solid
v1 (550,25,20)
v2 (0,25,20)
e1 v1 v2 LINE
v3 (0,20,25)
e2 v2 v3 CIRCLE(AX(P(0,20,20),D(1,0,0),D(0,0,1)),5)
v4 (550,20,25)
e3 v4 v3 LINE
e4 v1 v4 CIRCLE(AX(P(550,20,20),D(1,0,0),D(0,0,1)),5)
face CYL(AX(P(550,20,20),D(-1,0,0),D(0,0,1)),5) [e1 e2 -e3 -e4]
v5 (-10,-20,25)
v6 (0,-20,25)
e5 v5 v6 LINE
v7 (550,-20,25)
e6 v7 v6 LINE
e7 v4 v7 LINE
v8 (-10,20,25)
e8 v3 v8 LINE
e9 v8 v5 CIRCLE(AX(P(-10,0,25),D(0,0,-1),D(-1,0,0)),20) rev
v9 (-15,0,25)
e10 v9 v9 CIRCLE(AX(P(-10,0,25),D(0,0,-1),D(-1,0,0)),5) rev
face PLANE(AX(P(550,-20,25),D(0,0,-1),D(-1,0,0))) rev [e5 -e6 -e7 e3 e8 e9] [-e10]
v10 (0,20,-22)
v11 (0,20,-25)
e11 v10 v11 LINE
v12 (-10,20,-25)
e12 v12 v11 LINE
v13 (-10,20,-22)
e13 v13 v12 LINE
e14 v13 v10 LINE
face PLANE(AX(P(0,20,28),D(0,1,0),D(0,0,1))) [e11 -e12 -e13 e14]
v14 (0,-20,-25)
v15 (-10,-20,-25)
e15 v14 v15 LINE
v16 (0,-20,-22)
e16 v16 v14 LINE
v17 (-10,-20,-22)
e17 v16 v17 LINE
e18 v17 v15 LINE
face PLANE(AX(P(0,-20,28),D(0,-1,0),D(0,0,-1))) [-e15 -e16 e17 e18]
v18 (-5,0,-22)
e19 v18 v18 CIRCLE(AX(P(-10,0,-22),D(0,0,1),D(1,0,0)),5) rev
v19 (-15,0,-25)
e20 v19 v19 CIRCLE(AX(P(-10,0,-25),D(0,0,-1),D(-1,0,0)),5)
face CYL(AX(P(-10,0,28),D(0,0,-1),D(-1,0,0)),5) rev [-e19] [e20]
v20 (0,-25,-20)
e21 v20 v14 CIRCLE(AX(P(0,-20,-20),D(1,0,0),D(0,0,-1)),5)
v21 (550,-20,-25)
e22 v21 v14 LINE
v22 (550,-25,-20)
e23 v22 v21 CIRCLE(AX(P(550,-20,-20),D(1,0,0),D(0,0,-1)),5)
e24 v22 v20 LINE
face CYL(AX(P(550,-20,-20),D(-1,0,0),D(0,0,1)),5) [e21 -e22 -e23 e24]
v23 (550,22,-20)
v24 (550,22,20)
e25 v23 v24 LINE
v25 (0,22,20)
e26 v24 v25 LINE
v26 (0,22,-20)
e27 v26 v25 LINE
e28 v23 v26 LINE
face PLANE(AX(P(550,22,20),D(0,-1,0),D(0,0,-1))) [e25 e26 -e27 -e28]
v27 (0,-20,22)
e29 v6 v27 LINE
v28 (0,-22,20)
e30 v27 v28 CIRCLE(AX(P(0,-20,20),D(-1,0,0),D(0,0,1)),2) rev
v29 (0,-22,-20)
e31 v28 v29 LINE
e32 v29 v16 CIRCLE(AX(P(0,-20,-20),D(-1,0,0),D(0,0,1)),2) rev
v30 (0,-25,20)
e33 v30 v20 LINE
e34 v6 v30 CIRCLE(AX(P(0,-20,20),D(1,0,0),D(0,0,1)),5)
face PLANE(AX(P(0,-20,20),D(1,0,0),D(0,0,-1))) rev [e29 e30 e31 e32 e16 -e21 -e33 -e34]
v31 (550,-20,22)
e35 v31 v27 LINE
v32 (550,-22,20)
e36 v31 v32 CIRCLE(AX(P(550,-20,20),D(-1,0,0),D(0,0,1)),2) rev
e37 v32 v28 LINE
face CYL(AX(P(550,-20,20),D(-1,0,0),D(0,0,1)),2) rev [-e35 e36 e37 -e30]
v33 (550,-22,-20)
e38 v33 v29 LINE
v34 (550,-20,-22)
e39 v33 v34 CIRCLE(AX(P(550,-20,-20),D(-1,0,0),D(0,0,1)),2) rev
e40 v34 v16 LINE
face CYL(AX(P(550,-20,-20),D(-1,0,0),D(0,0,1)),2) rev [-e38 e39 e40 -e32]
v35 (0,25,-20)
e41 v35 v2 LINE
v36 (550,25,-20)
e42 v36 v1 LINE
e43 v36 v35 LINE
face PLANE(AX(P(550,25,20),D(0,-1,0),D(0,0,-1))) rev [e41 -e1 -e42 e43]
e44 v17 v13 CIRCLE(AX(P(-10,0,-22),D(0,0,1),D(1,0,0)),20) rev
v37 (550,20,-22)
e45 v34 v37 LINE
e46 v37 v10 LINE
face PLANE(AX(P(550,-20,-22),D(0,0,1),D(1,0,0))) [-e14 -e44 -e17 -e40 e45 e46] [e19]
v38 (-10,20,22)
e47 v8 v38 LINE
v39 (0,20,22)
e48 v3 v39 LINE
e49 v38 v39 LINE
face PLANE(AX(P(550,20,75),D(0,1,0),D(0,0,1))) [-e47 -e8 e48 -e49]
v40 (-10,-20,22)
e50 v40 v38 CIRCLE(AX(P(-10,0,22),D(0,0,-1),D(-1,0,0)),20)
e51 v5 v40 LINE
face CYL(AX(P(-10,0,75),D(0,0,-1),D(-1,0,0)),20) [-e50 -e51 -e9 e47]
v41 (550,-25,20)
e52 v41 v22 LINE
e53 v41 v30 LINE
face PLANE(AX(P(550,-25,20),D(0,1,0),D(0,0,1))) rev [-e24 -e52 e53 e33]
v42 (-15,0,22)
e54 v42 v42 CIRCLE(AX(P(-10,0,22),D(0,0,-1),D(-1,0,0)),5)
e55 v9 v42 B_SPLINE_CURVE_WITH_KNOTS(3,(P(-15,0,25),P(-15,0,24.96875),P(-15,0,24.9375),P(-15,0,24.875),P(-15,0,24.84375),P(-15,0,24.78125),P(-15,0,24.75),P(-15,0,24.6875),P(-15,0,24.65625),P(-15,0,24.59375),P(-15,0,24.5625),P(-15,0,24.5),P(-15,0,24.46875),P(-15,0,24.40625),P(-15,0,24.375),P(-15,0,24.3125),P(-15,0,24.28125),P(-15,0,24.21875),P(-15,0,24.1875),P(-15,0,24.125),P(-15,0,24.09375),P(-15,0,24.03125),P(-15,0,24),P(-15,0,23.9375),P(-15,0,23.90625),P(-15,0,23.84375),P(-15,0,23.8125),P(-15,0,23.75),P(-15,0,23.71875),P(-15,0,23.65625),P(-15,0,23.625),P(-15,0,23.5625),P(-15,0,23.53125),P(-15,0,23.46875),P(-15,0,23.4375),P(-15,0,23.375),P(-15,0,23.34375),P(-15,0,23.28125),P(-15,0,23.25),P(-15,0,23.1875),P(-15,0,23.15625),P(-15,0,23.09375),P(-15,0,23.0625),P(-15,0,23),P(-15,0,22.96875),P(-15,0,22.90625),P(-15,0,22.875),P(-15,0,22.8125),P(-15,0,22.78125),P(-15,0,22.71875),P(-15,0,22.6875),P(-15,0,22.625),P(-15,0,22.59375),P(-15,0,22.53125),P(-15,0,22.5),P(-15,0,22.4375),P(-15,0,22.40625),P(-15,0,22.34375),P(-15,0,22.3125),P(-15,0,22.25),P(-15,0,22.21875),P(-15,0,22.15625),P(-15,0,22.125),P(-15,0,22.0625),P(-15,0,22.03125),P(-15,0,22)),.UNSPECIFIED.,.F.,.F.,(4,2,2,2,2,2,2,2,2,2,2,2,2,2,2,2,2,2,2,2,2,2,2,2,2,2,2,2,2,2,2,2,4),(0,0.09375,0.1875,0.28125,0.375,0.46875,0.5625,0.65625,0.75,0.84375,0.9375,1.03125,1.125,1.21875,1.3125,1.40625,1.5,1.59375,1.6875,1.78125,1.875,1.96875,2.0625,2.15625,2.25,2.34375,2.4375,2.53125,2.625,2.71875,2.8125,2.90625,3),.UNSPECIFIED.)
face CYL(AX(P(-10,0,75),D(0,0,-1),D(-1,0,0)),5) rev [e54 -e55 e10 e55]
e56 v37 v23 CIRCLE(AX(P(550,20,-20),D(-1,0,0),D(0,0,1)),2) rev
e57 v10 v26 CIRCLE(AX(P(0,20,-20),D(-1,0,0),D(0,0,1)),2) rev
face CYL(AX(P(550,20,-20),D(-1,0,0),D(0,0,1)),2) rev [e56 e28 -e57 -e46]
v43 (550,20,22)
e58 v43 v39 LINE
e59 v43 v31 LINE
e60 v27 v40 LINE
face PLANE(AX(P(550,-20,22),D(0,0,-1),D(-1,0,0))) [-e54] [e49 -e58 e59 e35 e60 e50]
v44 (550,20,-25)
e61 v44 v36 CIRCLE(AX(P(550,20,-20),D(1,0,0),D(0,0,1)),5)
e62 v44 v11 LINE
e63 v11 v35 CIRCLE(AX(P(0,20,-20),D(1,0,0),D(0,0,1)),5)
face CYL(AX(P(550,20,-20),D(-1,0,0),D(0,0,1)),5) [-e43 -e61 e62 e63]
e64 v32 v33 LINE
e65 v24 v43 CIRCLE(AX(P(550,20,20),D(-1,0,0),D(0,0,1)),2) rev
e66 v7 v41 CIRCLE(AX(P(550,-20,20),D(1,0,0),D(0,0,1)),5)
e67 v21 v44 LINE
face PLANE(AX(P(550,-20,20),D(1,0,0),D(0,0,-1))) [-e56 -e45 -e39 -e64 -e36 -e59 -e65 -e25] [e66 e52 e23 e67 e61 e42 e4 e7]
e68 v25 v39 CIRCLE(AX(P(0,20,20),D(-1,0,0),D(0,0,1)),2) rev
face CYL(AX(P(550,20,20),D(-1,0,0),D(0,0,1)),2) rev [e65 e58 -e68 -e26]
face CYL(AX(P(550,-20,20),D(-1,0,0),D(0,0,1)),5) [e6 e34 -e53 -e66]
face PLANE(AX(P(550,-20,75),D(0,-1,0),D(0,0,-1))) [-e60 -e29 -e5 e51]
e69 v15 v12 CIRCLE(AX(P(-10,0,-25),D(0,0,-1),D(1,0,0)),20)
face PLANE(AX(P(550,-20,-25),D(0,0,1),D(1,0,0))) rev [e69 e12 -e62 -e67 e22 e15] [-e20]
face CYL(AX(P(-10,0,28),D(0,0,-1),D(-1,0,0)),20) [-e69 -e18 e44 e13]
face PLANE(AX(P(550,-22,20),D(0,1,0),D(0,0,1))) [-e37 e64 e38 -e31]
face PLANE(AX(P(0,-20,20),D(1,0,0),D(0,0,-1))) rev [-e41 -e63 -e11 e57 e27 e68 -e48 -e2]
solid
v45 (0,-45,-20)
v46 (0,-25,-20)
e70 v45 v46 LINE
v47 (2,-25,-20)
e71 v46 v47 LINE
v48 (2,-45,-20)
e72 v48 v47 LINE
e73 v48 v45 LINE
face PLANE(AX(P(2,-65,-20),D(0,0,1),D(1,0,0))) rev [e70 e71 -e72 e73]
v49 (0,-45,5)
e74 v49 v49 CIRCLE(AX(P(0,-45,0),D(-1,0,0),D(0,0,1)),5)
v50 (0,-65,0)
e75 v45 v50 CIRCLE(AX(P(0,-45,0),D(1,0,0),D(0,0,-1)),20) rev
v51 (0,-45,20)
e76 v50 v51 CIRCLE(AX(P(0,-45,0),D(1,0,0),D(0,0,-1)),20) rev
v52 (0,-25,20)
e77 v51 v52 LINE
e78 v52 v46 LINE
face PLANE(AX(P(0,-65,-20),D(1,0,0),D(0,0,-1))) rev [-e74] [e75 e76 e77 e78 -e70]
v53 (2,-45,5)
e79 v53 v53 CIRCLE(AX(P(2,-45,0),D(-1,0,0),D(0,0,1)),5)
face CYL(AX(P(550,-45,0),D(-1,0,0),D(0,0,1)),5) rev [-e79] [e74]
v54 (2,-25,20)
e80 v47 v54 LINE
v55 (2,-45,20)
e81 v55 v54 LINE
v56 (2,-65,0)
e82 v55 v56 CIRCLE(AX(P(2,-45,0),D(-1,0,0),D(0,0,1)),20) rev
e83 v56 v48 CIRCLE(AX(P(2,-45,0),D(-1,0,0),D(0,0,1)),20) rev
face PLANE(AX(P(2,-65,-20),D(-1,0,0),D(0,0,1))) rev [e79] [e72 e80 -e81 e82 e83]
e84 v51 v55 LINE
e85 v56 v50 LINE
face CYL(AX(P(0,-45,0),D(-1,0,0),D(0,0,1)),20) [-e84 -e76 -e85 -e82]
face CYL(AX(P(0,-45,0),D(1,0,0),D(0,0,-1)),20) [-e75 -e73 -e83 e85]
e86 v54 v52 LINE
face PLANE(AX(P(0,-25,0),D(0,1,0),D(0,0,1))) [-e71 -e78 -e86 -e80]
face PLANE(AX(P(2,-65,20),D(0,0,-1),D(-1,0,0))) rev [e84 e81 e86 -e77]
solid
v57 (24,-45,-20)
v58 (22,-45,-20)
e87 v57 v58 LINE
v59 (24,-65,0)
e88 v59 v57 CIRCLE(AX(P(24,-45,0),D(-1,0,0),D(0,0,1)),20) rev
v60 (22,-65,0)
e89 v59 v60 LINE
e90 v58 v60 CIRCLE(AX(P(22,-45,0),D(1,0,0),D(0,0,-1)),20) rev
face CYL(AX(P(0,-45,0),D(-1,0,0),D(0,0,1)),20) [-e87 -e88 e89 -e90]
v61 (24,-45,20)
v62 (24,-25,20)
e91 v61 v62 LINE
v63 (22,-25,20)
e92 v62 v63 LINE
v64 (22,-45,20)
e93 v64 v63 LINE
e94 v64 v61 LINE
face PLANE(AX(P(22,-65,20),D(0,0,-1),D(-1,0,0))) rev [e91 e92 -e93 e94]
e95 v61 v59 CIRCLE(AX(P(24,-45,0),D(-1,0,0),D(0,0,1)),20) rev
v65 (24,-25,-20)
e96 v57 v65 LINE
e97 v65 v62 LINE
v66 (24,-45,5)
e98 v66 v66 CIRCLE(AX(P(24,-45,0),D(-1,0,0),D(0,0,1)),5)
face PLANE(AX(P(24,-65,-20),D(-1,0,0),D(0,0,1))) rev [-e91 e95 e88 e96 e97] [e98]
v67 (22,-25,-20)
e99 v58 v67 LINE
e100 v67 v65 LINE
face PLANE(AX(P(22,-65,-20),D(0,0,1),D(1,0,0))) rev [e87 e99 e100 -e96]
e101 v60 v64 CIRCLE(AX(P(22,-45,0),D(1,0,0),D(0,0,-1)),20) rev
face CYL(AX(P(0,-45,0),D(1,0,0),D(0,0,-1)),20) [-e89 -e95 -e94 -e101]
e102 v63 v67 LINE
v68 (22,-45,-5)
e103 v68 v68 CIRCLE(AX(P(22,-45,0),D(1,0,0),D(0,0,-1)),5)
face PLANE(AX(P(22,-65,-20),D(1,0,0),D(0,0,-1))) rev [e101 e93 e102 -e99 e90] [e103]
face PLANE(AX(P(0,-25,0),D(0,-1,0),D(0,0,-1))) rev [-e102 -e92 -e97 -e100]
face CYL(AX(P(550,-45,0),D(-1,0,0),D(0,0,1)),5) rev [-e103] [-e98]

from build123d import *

# Parameters (mm, degrees)
EXTRUDE_THIN1_DEPTH   = 550
SKETCH3_R             = 5
BOSS_EXTRUDE2_DEPTH   = 3
BOSS_EXTRUDE3_START   = -47
SKETCH3_3_R           = 5
BOSS_EXTRUDE3_DEPTH   = 3
SKETCH5_W             = 2
SKETCH5_H             = 40
BOSS_EXTRUDE4_DEPTH   = 40
BOSS_EXTRUDE4_2_DEPTH = 40
FILLET1_R             = 20
FILLET2_R             = 20
SKETCH6_R             = 5
CUT_EXTRUDE2_DEPTH    = 555.391558377


with BuildPart() as part:
    # Sketch1 → Extrude-Thin1 (new body)
    with BuildSketch(Plane(origin=(0, 0, 0), x_dir=(0, 0, -1), z_dir=(1, 0, 0))):
        with BuildLine():
            Line((-25, 20), (-25, -20))
            ThreePointArc((-25, -20), (-23.535533906, -23.535533906), (-20, -25))
            Line((-20, -25), (20, -25))
            ThreePointArc((20, -25), (23.535533906, -23.535533906), (25, -20))
            Line((25, -20), (25, 20))
            ThreePointArc((25, 20), (23.535533906, 23.535533906), (20, 25))
            Line((20, 25), (-20, 25))
            ThreePointArc((-20, 25), (-23.535533906, 23.535533906), (-25, 20))
        make_face()
        with BuildLine():
            Line((-22, 20), (-22, -20))
            ThreePointArc((-22, -20), (-21.414213562, -21.414213562), (-20, -22))
            Line((-20, -22), (20, -22))
            ThreePointArc((20, -22), (21.414213562, -21.414213562), (22, -20))
            Line((22, -20), (22, 20))
            ThreePointArc((22, 20), (21.414213562, 21.414213562), (20, 22))
            Line((20, 22), (-20, 22))
            ThreePointArc((-20, 22), (-21.414213562, 21.414213562), (-22, 20))
        make_face(mode=Mode.SUBTRACT)
    extrude(amount=EXTRUDE_THIN1_DEPTH)

    # Sketch3 → Boss-Extrude2 (add)
    with BuildSketch(Plane(origin=(0, 0, -25), x_dir=(-1, 0, 0), z_dir=(0, 0, -1))):
        with BuildLine():
            Line((0, 20), (10, 20))
            ThreePointArc((10, 20), (30, 0), (10, -20))
            Line((10, -20), (0, -20))
            Line((0, -20), (0, 20))
        make_face()
        with Locations((10, 0)):
            Circle(SKETCH3_R, mode=Mode.SUBTRACT)
    extrude(amount=-BOSS_EXTRUDE2_DEPTH)

    # Sketch3<3> → Boss-Extrude3 (add)
    with BuildSketch(Plane(origin=(0, 0, -25), x_dir=(-1, 0, 0), z_dir=(0, 0, -1)).offset(BOSS_EXTRUDE3_START)):
        with BuildLine():
            Line((0, 20), (10, 20))
            ThreePointArc((10, 20), (30, 0), (10, -20))
            Line((10, -20), (0, -20))
            Line((0, -20), (0, 20))
        make_face()
        with Locations((10, 0)):
            Circle(SKETCH3_3_R, mode=Mode.SUBTRACT)
    extrude(amount=-BOSS_EXTRUDE3_DEPTH)


with BuildPart() as body_2:
    # Sketch5 → Boss-Extrude4 (new body)
    with BuildSketch(Plane(origin=(0, -25, 0), x_dir=(-1, 0, 0), z_dir=(0, -1, 0))):
        with Locations((-23, 0)):
            Rectangle(SKETCH5_W, SKETCH5_H)
    extrude(amount=BOSS_EXTRUDE4_DEPTH)

    # Fillet1
    fillet1_edges = [body_2.edges().sort_by_distance(p)[0] for p in [
        (23, -65, -20),
        (23, -65, 20),
    ]]
    fillet(fillet1_edges, radius=FILLET1_R - 0.0001)  # a hair under: the kernel refuses the full size


with BuildPart() as body_3:
    # Sketch5 → Boss-Extrude4 2 (new body)
    with BuildSketch(Plane(origin=(0, -25, 0), x_dir=(-1, 0, 0), z_dir=(0, -1, 0))):
        with Locations((-1, 0)):
            Rectangle(SKETCH5_W, SKETCH5_H)
    extrude(amount=BOSS_EXTRUDE4_2_DEPTH)

    # Fillet2
    fillet2_edges = [body_3.edges().sort_by_distance(p)[0] for p in [
        (1, -65, -20),
        (1, -65, 20),
    ]]
    fillet(fillet2_edges, radius=FILLET2_R - 0.0001)  # a hair under: the kernel refuses the full size


with BuildPart() as cut_extrude2_tool:
    # Sketch6 → Cut-Extrude2 (new, through all)
    with BuildSketch(Plane.ZY):
        with Locations((0, -45)):
            Circle(SKETCH6_R)
    extrude(amount=-CUT_EXTRUDE2_DEPTH)


with BuildPart() as body_2_1:
    add(body_2.part)

    # Cut-Extrude2: cut by cut_extrude2_tool
    add(cut_extrude2_tool.part, mode=Mode.SUBTRACT)


with BuildPart() as body_3_1:
    add(body_3.part)

    # Cut-Extrude2: cut by cut_extrude2_tool
    add(cut_extrude2_tool.part, mode=Mode.SUBTRACT)


solid = Compound([part.part, body_2_1.part, body_3_1.part])
